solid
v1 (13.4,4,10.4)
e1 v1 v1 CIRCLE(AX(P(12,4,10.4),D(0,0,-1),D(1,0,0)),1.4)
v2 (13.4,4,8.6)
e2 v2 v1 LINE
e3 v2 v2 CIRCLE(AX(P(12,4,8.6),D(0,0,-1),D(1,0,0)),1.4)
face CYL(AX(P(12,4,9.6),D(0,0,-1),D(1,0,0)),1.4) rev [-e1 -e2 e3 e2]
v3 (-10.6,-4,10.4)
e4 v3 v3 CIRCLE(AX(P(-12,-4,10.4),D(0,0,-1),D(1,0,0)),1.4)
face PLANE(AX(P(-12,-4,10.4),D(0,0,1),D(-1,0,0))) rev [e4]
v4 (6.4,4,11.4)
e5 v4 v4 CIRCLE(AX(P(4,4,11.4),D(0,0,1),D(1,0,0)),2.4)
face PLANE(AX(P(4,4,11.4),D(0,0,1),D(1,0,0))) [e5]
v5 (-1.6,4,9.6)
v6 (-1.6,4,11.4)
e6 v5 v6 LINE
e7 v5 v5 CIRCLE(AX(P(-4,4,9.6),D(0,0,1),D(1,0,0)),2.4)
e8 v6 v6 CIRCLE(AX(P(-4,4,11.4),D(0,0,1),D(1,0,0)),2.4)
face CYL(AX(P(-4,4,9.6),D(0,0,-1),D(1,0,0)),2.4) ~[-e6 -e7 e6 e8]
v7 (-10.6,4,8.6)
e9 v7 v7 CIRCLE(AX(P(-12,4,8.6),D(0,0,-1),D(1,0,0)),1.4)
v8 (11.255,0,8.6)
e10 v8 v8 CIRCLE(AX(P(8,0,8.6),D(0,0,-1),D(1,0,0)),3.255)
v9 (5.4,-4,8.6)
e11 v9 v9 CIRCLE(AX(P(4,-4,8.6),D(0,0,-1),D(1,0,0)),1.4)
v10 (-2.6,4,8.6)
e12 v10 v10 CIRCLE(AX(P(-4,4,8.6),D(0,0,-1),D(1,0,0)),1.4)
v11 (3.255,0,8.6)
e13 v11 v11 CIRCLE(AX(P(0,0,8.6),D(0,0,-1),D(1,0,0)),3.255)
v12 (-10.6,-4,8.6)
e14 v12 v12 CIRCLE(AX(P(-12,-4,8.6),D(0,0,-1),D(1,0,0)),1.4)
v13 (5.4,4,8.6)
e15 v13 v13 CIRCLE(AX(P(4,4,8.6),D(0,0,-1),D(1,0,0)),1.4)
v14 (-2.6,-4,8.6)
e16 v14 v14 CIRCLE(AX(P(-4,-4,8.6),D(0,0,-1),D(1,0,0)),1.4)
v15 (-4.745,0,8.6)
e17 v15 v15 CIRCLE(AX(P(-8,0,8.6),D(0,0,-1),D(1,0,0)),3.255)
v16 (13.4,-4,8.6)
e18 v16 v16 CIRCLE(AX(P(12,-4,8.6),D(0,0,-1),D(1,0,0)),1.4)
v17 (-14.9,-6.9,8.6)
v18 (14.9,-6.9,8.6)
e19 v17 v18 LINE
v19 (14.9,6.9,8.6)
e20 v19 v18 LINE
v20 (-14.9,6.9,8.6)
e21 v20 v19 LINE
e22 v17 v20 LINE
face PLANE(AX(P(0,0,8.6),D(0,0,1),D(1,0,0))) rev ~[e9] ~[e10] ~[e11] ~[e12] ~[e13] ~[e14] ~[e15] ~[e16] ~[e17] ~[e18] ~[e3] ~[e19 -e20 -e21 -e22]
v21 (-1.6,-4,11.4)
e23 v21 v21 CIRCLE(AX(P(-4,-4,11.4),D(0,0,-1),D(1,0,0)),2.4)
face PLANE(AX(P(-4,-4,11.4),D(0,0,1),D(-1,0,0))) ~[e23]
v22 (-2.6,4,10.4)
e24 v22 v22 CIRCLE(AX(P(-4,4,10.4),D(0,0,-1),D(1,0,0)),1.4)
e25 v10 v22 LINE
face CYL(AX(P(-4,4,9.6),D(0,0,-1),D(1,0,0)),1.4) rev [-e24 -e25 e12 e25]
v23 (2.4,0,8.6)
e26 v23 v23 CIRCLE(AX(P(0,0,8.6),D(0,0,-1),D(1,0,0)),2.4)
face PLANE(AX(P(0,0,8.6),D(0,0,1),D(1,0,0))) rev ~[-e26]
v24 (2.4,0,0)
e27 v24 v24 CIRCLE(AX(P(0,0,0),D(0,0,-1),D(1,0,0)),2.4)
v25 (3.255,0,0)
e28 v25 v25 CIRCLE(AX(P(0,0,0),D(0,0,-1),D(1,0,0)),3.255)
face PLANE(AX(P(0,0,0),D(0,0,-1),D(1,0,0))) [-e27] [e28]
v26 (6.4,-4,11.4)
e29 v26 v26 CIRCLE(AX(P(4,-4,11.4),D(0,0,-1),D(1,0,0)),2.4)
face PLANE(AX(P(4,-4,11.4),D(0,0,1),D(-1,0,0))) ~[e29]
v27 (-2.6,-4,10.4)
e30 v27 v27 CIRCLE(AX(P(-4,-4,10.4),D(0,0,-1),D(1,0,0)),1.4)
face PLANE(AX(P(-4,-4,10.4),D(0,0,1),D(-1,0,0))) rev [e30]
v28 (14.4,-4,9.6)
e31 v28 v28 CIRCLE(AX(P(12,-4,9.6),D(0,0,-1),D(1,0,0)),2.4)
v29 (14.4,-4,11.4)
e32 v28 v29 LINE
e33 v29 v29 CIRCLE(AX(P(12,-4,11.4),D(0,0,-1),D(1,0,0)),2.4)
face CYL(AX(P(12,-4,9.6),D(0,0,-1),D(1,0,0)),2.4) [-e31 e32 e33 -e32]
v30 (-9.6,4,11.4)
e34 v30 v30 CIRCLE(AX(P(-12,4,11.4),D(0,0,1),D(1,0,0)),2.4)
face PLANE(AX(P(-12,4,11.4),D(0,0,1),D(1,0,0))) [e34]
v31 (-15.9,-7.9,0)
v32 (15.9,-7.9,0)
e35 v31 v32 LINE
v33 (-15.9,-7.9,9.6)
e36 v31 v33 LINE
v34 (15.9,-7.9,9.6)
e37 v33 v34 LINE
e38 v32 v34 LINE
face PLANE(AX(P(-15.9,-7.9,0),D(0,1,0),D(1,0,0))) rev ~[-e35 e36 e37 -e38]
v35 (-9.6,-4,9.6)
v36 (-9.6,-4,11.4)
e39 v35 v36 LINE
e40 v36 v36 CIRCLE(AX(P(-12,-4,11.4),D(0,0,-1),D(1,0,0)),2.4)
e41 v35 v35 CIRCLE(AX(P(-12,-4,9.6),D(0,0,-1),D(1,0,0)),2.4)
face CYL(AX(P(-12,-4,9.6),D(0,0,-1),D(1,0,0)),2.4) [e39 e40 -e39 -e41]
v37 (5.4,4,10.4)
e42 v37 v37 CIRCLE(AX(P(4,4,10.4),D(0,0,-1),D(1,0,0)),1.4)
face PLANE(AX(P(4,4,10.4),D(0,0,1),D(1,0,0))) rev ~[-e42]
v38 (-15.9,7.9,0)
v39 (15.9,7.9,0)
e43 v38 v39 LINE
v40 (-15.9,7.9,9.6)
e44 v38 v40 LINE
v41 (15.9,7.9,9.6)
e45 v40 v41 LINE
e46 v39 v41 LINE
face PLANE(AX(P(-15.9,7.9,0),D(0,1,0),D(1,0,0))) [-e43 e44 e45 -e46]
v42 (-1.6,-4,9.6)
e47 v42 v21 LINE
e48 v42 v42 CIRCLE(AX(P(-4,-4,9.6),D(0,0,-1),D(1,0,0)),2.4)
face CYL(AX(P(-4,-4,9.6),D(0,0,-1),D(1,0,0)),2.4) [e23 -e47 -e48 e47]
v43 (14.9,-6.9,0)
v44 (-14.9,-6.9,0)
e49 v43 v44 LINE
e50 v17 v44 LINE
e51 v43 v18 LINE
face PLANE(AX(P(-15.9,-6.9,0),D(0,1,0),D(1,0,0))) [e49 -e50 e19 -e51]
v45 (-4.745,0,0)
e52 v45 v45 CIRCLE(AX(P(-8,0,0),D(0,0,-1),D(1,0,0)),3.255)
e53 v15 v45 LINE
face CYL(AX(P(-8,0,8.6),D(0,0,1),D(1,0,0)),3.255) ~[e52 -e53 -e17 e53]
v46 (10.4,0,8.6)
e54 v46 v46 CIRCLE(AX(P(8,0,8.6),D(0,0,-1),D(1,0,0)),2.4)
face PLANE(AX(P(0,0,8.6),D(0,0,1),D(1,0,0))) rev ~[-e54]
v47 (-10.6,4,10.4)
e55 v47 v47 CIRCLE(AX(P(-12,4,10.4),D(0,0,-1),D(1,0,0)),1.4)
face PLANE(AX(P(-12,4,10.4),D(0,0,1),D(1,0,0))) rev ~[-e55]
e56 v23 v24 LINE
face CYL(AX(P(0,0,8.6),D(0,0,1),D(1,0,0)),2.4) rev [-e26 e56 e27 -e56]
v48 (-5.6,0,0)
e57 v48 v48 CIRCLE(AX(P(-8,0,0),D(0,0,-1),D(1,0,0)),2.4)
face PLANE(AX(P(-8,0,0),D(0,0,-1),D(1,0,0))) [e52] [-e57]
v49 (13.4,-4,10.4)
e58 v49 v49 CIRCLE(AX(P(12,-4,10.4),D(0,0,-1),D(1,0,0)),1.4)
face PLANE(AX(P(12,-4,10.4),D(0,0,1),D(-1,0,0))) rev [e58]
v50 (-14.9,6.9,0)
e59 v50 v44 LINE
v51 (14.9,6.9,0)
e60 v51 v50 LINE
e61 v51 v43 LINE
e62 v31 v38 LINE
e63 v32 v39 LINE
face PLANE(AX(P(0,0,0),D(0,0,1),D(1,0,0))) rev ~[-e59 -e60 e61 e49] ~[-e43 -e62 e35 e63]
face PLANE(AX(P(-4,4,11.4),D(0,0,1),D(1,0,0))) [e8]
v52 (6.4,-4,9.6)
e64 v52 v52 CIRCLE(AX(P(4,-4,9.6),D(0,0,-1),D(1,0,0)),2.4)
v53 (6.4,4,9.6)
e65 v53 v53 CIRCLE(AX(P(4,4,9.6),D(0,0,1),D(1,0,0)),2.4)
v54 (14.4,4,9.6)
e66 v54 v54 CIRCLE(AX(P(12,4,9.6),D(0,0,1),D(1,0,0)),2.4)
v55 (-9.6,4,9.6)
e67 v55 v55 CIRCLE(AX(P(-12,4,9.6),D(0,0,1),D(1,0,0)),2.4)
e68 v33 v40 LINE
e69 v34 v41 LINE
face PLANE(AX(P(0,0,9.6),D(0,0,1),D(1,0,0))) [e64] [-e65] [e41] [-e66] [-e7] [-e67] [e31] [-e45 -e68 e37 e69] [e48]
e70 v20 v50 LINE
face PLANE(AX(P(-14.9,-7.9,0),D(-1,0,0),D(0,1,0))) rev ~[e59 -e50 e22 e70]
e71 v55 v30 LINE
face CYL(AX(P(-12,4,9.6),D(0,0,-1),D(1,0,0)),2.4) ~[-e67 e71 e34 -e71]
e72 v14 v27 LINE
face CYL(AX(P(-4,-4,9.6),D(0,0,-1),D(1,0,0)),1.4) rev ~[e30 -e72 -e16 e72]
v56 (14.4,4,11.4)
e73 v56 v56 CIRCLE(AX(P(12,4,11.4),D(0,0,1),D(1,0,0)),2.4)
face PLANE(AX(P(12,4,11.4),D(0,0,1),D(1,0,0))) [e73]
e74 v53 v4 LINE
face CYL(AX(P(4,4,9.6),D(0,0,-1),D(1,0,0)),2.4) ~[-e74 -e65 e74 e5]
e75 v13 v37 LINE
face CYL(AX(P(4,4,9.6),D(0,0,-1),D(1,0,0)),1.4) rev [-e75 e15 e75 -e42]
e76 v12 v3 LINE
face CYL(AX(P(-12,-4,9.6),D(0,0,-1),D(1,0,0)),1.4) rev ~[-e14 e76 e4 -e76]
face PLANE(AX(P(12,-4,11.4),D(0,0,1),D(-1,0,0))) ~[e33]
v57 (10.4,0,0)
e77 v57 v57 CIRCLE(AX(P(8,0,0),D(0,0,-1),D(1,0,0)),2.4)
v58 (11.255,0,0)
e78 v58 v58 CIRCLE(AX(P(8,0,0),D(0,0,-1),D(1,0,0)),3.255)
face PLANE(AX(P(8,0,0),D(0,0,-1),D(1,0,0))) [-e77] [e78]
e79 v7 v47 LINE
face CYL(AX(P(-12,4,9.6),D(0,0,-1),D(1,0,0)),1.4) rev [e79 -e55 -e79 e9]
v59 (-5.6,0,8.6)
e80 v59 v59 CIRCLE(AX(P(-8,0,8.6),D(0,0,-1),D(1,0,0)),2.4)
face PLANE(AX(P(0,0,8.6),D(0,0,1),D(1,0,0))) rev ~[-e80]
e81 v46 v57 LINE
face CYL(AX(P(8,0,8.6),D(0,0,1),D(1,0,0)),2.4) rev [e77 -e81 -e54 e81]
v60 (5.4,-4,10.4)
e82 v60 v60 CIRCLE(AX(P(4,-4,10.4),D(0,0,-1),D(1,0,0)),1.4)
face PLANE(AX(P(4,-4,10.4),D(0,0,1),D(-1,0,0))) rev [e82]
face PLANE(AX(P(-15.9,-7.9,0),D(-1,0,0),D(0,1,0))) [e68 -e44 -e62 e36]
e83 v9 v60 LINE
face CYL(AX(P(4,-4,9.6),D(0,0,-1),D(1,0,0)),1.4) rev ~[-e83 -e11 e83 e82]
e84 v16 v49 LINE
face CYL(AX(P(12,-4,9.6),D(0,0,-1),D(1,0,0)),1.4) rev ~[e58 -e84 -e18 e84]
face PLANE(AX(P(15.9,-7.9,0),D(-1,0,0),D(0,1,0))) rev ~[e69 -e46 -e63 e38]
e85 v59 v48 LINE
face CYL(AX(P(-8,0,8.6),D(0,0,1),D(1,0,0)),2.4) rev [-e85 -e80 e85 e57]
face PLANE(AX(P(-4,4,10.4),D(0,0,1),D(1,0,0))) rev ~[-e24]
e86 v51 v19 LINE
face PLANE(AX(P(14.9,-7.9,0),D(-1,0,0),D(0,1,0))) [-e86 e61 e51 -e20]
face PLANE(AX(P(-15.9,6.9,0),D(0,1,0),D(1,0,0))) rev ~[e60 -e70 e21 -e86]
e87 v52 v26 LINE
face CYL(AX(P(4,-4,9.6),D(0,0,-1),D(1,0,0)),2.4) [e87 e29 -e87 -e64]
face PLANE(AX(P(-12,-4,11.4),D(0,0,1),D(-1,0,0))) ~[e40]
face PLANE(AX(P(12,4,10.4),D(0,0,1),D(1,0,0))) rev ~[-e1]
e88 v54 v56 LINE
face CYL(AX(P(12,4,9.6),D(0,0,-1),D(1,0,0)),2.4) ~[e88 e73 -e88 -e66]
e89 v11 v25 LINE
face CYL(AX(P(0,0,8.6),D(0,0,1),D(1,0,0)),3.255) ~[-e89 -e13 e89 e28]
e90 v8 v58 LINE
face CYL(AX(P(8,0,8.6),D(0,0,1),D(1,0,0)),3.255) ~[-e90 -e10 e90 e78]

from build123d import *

# Parameters (mm, degrees)
F0_W     = 31.8
F0_H     = 15.8
F1_DEPTH = 9.6
F2_R     = 2.4
F3_DEPTH = 1.8
F4_T     = -1
F5_R     = 3.255
F5_R_2   = 2.4
F6_DEPTH = 8.6


# Not quite as in the source:
# - a pattern or mirror of a feature is missing from the dataset's text; its kind, count and spacing are read off the source's solid


with BuildPart() as f1:
    # F0 (on Top) → F1 (new body)
    with BuildSketch(Plane.XY):
        Rectangle(F0_W, F0_H)
    extrude(amount=F1_DEPTH)

    # F2 (on face) → F3 (join)
    with BuildSketch(Plane.XY.offset(9.6)):
        with Locations((-12, 4)):
            Circle(F2_R)
        with Locations((-4, 4)):
            Circle(F2_R)
        with Locations((4, 4)):
            Circle(F2_R)
        with Locations((12, 4)):
            Circle(F2_R)
    f3 = extrude(amount=F3_DEPTH)

    # F3_copies: F3 across plane
    add(f3.mirror(Plane(origin=(0, 0, 0), x_dir=(0, 0, -1), z_dir=(0, -1, 0))))

    # F4
    f4_openings = [f1.faces().sort_by_distance(p)[0] for p in [
        (0, 0, 0),
    ]]
    offset(amount=F4_T, openings=f4_openings, kind=Kind.INTERSECTION)

    # F5 (on face) → F6 (join, through all)
    with BuildSketch(Plane(origin=(0, 0, 8.6), x_dir=(1, 0, 0), z_dir=(0, 0, -1))):
        with Locations((-8, 0)):
            Circle(F5_R)
        with Locations((-8, 0)):
            Circle(F5_R_2, mode=Mode.SUBTRACT)
        Circle(F5_R)
        Circle(F5_R_2, mode=Mode.SUBTRACT)
        with Locations((8, 0)):
            Circle(F5_R)
        with Locations((8, 0)):
            Circle(F5_R_2, mode=Mode.SUBTRACT)
    extrude(amount=F6_DEPTH)


solid = f1.part
